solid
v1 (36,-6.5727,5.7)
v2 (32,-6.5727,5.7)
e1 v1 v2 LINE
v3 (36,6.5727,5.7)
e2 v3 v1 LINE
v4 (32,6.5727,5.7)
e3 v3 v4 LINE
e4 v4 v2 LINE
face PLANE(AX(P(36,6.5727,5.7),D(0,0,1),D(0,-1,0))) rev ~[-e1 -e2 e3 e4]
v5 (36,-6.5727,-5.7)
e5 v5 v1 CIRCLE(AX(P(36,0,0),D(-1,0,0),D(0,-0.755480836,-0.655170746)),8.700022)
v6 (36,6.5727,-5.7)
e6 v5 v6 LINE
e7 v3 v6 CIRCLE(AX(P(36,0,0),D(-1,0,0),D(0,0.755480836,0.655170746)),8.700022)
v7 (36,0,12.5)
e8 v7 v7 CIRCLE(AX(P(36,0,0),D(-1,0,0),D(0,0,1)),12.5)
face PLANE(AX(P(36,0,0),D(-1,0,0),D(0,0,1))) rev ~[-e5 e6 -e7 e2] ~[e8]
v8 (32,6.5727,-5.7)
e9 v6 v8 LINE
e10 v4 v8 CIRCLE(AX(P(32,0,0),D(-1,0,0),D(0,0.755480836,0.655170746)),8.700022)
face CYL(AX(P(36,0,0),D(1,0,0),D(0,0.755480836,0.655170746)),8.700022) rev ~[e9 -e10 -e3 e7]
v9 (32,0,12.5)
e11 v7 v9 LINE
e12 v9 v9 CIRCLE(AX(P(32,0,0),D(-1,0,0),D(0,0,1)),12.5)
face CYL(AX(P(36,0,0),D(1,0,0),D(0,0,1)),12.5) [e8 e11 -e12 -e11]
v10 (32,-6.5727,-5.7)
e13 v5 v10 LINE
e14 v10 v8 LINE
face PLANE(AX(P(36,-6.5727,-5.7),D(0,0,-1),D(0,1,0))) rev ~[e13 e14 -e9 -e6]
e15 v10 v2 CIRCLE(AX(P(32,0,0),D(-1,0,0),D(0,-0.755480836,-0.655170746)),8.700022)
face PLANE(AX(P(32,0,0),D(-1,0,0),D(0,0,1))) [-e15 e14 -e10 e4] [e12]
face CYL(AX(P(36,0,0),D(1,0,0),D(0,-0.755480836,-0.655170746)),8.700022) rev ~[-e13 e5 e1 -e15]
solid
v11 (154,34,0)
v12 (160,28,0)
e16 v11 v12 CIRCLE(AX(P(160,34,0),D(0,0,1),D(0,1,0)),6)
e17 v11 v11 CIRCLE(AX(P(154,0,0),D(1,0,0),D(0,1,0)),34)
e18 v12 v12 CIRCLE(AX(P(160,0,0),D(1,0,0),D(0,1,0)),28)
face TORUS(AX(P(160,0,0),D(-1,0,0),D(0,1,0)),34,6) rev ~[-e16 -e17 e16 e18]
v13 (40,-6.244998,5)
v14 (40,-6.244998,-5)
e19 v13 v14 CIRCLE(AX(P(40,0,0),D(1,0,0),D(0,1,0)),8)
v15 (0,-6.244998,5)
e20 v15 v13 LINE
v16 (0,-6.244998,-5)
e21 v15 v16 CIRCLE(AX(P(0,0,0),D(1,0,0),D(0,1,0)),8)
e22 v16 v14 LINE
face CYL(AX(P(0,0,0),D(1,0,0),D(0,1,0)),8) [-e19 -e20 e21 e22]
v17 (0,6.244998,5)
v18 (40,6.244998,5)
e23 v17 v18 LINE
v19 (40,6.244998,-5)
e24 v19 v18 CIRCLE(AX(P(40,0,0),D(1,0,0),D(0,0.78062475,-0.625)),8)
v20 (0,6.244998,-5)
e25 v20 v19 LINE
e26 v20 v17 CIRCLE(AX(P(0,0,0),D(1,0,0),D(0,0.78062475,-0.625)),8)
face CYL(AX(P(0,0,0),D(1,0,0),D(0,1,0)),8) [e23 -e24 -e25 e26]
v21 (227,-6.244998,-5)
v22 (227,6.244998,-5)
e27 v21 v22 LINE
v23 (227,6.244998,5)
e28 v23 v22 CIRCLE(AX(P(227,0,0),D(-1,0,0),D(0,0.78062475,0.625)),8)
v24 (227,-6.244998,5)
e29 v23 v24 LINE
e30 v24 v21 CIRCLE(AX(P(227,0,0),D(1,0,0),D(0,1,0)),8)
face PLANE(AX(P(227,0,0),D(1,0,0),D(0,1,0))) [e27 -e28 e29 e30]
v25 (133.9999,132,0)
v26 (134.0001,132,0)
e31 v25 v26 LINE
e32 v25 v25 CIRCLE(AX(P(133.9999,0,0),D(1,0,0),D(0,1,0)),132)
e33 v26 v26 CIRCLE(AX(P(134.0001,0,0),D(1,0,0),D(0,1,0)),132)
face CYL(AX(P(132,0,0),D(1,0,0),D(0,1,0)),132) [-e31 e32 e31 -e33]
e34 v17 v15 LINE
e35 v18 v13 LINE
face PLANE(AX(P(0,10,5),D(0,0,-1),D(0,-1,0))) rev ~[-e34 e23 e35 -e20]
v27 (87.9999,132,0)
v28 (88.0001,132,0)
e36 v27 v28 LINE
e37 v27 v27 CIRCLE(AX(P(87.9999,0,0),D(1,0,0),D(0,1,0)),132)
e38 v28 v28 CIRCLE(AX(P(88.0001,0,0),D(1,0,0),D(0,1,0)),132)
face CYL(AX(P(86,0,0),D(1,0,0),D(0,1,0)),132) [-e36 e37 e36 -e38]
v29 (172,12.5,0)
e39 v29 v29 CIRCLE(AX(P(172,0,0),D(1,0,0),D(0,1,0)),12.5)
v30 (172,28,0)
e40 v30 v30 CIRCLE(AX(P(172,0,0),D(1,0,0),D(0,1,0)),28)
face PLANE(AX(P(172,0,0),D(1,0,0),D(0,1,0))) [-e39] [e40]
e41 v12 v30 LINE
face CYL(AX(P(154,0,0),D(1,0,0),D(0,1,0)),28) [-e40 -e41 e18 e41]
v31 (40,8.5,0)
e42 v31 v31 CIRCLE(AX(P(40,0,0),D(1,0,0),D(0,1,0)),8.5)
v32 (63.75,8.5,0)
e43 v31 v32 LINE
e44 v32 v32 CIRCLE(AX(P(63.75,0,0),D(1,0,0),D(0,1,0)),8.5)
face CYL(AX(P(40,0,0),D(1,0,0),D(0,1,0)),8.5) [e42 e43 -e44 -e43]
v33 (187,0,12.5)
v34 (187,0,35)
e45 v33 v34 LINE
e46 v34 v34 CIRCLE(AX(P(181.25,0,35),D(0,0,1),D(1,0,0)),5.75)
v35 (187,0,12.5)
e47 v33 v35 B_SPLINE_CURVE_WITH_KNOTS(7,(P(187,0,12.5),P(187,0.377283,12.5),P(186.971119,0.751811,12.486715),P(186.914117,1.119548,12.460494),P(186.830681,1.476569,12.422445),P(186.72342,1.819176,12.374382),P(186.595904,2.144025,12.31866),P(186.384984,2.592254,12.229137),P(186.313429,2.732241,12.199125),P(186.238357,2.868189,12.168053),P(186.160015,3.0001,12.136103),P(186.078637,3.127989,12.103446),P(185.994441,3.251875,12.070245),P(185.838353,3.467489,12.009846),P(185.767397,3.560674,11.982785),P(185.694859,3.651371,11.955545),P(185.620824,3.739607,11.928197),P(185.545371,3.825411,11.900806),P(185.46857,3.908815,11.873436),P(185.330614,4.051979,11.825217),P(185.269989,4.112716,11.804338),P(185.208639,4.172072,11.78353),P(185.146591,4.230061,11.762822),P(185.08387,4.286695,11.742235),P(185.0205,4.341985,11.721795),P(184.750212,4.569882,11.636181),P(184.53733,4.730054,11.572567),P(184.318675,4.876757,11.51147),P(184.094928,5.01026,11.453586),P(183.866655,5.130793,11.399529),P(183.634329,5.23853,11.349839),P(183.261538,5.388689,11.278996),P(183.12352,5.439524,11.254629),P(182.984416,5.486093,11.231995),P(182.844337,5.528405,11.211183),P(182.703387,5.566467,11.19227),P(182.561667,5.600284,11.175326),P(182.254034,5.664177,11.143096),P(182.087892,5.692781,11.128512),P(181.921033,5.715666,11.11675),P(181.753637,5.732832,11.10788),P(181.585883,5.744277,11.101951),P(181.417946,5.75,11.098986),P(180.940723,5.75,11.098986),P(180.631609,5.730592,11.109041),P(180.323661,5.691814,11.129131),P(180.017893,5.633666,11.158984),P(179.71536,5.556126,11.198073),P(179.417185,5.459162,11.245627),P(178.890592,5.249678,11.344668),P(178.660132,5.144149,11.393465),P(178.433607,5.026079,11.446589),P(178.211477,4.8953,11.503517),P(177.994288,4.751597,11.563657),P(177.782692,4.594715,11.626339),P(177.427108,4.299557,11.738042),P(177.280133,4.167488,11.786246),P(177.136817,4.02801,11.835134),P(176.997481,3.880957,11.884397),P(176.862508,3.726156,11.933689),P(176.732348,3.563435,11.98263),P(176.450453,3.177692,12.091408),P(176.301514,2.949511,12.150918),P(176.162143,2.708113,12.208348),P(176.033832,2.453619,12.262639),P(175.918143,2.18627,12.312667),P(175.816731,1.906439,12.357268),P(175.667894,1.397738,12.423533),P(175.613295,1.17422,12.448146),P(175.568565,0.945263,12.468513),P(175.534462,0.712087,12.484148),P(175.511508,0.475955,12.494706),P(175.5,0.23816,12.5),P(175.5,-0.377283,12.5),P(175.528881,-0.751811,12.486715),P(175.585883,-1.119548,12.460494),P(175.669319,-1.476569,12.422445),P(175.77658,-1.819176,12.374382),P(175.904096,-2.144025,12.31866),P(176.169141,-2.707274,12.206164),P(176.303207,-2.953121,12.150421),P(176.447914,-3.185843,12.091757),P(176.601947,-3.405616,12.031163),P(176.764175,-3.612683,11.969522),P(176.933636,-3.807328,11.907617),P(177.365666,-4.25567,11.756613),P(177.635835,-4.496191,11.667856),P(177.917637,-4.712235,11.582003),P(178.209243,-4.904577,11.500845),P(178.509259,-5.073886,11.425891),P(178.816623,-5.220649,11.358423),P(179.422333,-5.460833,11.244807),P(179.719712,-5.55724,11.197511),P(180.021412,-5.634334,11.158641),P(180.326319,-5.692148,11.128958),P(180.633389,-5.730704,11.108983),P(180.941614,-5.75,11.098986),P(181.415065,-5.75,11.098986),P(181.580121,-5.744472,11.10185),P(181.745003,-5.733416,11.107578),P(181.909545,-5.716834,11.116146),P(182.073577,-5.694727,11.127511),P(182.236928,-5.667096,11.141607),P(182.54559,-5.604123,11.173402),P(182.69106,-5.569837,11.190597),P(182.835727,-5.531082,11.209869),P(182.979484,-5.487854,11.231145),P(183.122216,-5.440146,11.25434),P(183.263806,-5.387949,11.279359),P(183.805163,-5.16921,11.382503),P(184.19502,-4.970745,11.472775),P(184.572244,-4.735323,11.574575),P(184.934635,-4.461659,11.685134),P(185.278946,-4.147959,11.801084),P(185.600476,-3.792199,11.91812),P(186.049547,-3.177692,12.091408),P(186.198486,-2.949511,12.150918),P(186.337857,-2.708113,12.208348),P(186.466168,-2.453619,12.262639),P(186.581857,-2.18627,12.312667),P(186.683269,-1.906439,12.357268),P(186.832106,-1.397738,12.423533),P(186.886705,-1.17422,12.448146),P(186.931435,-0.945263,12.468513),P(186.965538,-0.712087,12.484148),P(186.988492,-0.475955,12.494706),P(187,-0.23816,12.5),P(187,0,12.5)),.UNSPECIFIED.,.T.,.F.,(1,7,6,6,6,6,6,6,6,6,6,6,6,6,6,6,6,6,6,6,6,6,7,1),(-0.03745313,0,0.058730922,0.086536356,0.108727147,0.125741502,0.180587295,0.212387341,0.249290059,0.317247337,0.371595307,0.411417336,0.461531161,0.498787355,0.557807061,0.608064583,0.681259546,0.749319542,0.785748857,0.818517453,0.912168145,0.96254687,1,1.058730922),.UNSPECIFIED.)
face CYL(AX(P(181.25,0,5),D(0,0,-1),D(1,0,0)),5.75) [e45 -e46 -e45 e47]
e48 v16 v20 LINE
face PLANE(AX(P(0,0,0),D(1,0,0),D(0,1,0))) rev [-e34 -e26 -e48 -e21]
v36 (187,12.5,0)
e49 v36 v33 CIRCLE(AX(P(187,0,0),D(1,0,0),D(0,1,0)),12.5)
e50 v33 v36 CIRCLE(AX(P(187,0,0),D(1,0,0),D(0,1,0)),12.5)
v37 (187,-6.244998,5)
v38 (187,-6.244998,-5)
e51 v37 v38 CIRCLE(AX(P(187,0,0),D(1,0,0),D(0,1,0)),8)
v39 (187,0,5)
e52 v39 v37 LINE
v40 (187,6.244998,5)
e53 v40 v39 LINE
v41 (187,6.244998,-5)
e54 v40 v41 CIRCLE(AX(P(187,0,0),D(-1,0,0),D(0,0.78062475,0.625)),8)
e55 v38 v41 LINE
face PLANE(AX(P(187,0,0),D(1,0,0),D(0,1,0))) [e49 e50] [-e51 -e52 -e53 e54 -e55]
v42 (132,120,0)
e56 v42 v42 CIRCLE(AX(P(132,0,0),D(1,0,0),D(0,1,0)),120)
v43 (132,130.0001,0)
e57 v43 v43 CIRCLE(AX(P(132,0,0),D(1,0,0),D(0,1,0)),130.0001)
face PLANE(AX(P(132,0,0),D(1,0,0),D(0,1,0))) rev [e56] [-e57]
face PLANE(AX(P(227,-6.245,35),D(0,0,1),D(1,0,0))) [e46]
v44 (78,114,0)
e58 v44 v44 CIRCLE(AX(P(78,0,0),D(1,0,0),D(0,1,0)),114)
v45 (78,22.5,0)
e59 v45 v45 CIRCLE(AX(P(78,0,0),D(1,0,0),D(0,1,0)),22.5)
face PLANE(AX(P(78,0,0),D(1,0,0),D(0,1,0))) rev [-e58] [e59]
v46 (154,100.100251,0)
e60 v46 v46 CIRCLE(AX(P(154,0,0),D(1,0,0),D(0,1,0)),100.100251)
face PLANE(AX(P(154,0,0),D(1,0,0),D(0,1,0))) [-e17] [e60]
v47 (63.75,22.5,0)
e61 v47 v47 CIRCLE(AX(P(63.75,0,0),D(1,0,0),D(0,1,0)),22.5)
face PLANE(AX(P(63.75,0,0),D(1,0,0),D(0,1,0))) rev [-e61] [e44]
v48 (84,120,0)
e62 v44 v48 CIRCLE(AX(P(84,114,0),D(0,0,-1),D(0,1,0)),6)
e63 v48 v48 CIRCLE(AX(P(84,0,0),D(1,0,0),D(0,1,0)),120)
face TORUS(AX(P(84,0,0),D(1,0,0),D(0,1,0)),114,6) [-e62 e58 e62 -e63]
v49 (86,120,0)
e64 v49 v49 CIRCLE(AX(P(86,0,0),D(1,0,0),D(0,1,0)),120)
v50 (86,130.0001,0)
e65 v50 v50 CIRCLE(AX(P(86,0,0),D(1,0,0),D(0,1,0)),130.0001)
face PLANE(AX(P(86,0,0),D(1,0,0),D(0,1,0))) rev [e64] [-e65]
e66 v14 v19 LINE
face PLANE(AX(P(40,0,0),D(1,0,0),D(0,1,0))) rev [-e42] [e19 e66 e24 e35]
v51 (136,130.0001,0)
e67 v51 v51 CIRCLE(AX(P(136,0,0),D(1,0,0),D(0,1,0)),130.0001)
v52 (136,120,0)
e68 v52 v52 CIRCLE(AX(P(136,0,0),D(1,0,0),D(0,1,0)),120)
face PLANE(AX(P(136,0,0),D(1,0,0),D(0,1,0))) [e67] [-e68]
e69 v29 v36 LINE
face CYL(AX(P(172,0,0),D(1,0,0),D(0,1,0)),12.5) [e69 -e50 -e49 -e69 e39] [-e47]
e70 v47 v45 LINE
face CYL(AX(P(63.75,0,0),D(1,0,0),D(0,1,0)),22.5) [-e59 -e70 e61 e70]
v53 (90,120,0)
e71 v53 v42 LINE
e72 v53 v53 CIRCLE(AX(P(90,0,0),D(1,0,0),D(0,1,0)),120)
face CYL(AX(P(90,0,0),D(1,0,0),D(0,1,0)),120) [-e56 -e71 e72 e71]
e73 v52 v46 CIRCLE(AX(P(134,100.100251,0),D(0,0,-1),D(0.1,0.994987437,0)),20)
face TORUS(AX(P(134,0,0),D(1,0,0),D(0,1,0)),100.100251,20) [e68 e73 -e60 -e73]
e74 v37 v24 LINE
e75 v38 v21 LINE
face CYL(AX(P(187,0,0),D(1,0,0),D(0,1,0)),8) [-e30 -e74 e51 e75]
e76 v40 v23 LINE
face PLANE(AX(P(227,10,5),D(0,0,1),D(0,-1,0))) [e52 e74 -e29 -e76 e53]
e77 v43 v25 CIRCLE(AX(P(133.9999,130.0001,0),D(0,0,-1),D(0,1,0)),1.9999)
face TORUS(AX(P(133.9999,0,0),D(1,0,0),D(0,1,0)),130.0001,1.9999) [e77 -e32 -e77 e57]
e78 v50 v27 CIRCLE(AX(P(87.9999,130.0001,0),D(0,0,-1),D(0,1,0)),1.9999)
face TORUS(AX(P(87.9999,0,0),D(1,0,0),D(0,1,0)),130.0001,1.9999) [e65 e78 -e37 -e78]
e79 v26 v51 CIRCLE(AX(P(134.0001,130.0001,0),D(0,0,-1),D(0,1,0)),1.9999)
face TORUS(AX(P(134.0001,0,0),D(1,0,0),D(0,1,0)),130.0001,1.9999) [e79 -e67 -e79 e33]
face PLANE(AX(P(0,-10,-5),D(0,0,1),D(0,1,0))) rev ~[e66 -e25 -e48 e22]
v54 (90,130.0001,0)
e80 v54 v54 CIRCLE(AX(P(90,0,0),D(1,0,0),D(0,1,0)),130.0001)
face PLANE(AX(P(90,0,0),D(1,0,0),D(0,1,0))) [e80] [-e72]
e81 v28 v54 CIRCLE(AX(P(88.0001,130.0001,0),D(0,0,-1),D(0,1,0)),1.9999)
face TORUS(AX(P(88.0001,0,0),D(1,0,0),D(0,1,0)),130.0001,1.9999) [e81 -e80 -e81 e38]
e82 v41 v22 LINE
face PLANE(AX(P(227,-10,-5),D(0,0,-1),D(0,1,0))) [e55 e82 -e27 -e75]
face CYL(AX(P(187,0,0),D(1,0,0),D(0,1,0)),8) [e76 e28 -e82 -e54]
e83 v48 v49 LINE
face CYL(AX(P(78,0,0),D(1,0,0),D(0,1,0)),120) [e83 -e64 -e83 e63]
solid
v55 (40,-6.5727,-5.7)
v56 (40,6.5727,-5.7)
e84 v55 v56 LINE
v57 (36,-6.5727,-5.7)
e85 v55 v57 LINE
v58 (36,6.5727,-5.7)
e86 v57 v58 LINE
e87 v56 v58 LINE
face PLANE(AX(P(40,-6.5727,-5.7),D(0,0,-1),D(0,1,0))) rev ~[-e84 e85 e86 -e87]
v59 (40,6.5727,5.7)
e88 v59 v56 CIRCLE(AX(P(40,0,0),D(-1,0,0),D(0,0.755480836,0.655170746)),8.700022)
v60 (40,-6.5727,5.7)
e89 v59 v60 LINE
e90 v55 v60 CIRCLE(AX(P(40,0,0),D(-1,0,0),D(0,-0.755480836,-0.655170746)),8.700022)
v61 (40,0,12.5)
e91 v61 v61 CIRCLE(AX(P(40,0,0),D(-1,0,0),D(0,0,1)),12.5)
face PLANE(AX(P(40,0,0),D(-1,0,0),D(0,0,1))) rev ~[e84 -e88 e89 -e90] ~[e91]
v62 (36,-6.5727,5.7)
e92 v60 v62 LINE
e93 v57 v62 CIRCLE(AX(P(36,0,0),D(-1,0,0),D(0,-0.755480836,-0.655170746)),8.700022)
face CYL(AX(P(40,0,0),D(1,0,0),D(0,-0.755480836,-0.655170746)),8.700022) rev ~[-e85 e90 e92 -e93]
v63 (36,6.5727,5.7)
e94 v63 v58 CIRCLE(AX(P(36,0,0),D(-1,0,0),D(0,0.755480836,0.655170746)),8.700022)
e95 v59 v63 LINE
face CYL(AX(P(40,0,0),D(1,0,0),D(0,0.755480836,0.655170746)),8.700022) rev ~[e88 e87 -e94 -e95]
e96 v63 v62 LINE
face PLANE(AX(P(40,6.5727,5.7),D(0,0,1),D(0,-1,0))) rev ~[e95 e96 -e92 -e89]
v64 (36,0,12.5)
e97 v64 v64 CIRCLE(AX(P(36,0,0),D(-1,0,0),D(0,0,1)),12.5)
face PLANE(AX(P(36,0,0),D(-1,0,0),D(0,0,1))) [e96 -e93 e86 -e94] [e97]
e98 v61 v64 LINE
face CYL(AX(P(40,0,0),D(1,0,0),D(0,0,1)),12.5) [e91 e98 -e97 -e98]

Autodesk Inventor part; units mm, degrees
ref_plane "YZ Plane" through (0, 0, 0) normal (1, 0, 0) x (0, 1, 0)
ref_plane "XZ Plane" through (0, 0, 0) normal (0, 1, 0) x (-1, 0, 0)
ref_plane "XY Plane" through (0, 0, 0) normal (0, 0, 1) x (1, 0, 0)
sketch "Sketch1" plane through (0, 0, 0) normal (0, 0, 1) x (1, 0, 0)
  line L0 (0, 0) -> (0, 8)
  line L1 (0, 8) -> (40, 8)
  line L2 (40, 8) -> (40, 8.5)
  line L3 (40, 8.5) -> (63.75, 8.5)
  line L4 (63.75, 8.5) -> (63.75, 22.5)
  line L5 (63.75, 22.5) -> (78, 22.5)
  line L6 (78, 22.5) -> (78, 120)
  line L7 (78, 120) -> (86, 120)
  line L8 (86, 120) -> (86, 132)
  line L9 (86, 132) -> (90, 132)
  line L10 (90, 132) -> (90, 120)
  line L11 (90, 120) -> (132, 120)
  line L12 (132, 120) -> (132, 132)
  line L13 (132, 132) -> (136, 132)
  line L14 (136, 132) -> (136, 120)
  line L15 (136, 120) -> (154, 120)
  line L16 (154, 120) -> (154, 28)
  line L17 (154, 28) -> (172, 28)
  line L18 (172, 28) -> (172, 12.5)
  line L19 (172, 12.5) -> (187, 12.5)
  line L20 (187, 12.5) -> (187, 8)
  line L21 (187, 8) -> (227, 8)
  line L22 (227, 8) -> (227, 0)
  line L23 (0, 0) -> (227, 0)
  line L24 (-45.4, 0) -> (272.4, 0) projected
  point P0 (111, 120)
  point P1 (32, 8)
  dimension "d0" = 8
  dimension "d1" = 8
  dimension "d2" = 46
  dimension "d3" = 8.5
  dimension "d4" = 14.25
  dimension "d5" = 23.75
  dimension "d6" = 22.5
  dimension "d7" = 40
  dimension "d8" = 4
  dimension "d9" = 12
  dimension "d11" = 4
  dimension "d12" = 50
  dimension "d14" = 28
  dimension "d16" = 36
  dimension "d18" = 15
  dimension "d19" = 12.5
  dimension "d20" = 40
  dimension "d21" = 18
  dimension "d22" = 147
  dimension "d38" = 120
  dimension "d52" = 76
  dimension "d54" = 8
  dimension "d55" = 79
  dimension "d56" = 155
revolve "Revolution1" add sketch "Sketch1" angle 360 about axis through (-10, 0, 0) along (1, 0, 0)
fillet "Fillet1" radius 20 1 edges at (154, -120, 0)
fillet "Fillet2" radius 6 1 edges at (78, -120, 0)
fillet "Fillet4" radius 2 4 edges at (132, -132, 0) (136, -132, 0) (86, -132, 0) (90, -132, 0)
fillet "Fillet6" radius 6 1 edges at (154, -28, 0)
sketch "Sketch2" plane through (0, 0, 0) normal (-1, 0, 0) x (0, 0, 1)
  line L0 (5, -10) -> (-5, -10)
  line L1 (-5, -10) -> (-5, 10)
  line L2 (-5, 10) -> (5, 10)
  line L3 (5, 10) -> (5, -10)
  line L4 (5, -10) -> (-5, 10) construction
  line L5 (-5, -10) -> (5, 10) construction
  line L6 (-13, 18) -> (-13, -18)
  line L7 (-13, -18) -> (13, -18)
  line L8 (13, -18) -> (13, 18)
  line L9 (13, 18) -> (-13, 18)
  point P0 (0, 0)
  dimension "d29" = 10
  dimension "d30" = 20
  dimension "d31" = 8
extrude "Extrusion1" cut sketch "Sketch2" against normal up to surface (40 mm away)
sketch "Sketch3" plane through (227, 0, 0) normal (1, 0, 0) x (0, 0, -1)
  line L0 (-13, 18) -> (13, 18) projected
  line L1 (13, 18) -> (13, -18) projected
  line L2 (13, -18) -> (-13, -18) projected
  line L3 (5, 10) -> (-5, 10) projected
  line L4 (5, -10) -> (5, 10) projected
  line L5 (-5, -10) -> (5, -10) projected
  line L6 (-5, 10) -> (-5, -10) projected
  line L7 (-13, -18) -> (-13, 18) projected
  point P0 (0, 0)
extrude "Extrusion2" cut sketch "Sketch3" against normal up to surface (40 mm away)
sketch "Sketch6" plane through (40, 0, 0) normal (-1, 0, 0) x (0, 0, 1)
  circle A0 centre (0, 0) radius 12.5 projected
  arc A1 (5, 6.245) -> (-5, 6.245) centre (0, 0) ccw projected
  line L0 (-5, -6.245) -> (-5, 6.245) projected
  arc A2 (-5, -6.245) -> (5, -6.245) centre (0, 0) ccw projected
  line L1 (5, 6.245) -> (5, -6.245) projected
  arc A3 (5.7, 6.5727) -> (-5.7, 6.5727) centre (0, 0) ccw
  line L2 (5.7, 6.5727) -> (5.7, -6.5727)
  arc A4 (-5.7, -6.5727) -> (5.7, -6.5727) centre (0, 0) ccw
  line L3 (-5.7, -6.5727) -> (-5.7, 6.5727)
  dimension "d44" = 0.7
extrude "Extrusion5" add sketch "Sketch6" along normal blind 4 separate body contours A0
sketch "Sketch7" plane through (36, 0, 0) normal (-1, 0, 0) x (0, 0, 1)
  line L0 (5.7, 6.5727) -> (5.7, -6.5727) projected
  arc A0 (-5.7, -6.5727) -> (5.7, -6.5727) centre (0, 0) ccw projected
  line L1 (-5.7, -6.5727) -> (-5.7, 6.5727) projected
  arc A1 (5.7, 6.5727) -> (-5.7, 6.5727) centre (0, 0) ccw projected
  circle A2 centre (0, 0) radius 12.5 projected
extrude "Extrusion6" add sketch "Sketch7" along normal blind 4 separate body
sketch "Sketch9" plane through (227, -6.245, 5) normal (0, 0, 1) x (1, 0, 0)
  line L0 (-40, -6.255) -> (-40, 18.745) construction
  circle A0 centre (-45.75, 6.245) radius 5.75
  point P0 (-227, 6.245)
  dimension "d49" = 11.5
extrude "Extrusion7" add sketch "Sketch9" along normal blind 30 bodies 1
equation "\"d11\" = d8"
properties part number "HubMotor3KW"
